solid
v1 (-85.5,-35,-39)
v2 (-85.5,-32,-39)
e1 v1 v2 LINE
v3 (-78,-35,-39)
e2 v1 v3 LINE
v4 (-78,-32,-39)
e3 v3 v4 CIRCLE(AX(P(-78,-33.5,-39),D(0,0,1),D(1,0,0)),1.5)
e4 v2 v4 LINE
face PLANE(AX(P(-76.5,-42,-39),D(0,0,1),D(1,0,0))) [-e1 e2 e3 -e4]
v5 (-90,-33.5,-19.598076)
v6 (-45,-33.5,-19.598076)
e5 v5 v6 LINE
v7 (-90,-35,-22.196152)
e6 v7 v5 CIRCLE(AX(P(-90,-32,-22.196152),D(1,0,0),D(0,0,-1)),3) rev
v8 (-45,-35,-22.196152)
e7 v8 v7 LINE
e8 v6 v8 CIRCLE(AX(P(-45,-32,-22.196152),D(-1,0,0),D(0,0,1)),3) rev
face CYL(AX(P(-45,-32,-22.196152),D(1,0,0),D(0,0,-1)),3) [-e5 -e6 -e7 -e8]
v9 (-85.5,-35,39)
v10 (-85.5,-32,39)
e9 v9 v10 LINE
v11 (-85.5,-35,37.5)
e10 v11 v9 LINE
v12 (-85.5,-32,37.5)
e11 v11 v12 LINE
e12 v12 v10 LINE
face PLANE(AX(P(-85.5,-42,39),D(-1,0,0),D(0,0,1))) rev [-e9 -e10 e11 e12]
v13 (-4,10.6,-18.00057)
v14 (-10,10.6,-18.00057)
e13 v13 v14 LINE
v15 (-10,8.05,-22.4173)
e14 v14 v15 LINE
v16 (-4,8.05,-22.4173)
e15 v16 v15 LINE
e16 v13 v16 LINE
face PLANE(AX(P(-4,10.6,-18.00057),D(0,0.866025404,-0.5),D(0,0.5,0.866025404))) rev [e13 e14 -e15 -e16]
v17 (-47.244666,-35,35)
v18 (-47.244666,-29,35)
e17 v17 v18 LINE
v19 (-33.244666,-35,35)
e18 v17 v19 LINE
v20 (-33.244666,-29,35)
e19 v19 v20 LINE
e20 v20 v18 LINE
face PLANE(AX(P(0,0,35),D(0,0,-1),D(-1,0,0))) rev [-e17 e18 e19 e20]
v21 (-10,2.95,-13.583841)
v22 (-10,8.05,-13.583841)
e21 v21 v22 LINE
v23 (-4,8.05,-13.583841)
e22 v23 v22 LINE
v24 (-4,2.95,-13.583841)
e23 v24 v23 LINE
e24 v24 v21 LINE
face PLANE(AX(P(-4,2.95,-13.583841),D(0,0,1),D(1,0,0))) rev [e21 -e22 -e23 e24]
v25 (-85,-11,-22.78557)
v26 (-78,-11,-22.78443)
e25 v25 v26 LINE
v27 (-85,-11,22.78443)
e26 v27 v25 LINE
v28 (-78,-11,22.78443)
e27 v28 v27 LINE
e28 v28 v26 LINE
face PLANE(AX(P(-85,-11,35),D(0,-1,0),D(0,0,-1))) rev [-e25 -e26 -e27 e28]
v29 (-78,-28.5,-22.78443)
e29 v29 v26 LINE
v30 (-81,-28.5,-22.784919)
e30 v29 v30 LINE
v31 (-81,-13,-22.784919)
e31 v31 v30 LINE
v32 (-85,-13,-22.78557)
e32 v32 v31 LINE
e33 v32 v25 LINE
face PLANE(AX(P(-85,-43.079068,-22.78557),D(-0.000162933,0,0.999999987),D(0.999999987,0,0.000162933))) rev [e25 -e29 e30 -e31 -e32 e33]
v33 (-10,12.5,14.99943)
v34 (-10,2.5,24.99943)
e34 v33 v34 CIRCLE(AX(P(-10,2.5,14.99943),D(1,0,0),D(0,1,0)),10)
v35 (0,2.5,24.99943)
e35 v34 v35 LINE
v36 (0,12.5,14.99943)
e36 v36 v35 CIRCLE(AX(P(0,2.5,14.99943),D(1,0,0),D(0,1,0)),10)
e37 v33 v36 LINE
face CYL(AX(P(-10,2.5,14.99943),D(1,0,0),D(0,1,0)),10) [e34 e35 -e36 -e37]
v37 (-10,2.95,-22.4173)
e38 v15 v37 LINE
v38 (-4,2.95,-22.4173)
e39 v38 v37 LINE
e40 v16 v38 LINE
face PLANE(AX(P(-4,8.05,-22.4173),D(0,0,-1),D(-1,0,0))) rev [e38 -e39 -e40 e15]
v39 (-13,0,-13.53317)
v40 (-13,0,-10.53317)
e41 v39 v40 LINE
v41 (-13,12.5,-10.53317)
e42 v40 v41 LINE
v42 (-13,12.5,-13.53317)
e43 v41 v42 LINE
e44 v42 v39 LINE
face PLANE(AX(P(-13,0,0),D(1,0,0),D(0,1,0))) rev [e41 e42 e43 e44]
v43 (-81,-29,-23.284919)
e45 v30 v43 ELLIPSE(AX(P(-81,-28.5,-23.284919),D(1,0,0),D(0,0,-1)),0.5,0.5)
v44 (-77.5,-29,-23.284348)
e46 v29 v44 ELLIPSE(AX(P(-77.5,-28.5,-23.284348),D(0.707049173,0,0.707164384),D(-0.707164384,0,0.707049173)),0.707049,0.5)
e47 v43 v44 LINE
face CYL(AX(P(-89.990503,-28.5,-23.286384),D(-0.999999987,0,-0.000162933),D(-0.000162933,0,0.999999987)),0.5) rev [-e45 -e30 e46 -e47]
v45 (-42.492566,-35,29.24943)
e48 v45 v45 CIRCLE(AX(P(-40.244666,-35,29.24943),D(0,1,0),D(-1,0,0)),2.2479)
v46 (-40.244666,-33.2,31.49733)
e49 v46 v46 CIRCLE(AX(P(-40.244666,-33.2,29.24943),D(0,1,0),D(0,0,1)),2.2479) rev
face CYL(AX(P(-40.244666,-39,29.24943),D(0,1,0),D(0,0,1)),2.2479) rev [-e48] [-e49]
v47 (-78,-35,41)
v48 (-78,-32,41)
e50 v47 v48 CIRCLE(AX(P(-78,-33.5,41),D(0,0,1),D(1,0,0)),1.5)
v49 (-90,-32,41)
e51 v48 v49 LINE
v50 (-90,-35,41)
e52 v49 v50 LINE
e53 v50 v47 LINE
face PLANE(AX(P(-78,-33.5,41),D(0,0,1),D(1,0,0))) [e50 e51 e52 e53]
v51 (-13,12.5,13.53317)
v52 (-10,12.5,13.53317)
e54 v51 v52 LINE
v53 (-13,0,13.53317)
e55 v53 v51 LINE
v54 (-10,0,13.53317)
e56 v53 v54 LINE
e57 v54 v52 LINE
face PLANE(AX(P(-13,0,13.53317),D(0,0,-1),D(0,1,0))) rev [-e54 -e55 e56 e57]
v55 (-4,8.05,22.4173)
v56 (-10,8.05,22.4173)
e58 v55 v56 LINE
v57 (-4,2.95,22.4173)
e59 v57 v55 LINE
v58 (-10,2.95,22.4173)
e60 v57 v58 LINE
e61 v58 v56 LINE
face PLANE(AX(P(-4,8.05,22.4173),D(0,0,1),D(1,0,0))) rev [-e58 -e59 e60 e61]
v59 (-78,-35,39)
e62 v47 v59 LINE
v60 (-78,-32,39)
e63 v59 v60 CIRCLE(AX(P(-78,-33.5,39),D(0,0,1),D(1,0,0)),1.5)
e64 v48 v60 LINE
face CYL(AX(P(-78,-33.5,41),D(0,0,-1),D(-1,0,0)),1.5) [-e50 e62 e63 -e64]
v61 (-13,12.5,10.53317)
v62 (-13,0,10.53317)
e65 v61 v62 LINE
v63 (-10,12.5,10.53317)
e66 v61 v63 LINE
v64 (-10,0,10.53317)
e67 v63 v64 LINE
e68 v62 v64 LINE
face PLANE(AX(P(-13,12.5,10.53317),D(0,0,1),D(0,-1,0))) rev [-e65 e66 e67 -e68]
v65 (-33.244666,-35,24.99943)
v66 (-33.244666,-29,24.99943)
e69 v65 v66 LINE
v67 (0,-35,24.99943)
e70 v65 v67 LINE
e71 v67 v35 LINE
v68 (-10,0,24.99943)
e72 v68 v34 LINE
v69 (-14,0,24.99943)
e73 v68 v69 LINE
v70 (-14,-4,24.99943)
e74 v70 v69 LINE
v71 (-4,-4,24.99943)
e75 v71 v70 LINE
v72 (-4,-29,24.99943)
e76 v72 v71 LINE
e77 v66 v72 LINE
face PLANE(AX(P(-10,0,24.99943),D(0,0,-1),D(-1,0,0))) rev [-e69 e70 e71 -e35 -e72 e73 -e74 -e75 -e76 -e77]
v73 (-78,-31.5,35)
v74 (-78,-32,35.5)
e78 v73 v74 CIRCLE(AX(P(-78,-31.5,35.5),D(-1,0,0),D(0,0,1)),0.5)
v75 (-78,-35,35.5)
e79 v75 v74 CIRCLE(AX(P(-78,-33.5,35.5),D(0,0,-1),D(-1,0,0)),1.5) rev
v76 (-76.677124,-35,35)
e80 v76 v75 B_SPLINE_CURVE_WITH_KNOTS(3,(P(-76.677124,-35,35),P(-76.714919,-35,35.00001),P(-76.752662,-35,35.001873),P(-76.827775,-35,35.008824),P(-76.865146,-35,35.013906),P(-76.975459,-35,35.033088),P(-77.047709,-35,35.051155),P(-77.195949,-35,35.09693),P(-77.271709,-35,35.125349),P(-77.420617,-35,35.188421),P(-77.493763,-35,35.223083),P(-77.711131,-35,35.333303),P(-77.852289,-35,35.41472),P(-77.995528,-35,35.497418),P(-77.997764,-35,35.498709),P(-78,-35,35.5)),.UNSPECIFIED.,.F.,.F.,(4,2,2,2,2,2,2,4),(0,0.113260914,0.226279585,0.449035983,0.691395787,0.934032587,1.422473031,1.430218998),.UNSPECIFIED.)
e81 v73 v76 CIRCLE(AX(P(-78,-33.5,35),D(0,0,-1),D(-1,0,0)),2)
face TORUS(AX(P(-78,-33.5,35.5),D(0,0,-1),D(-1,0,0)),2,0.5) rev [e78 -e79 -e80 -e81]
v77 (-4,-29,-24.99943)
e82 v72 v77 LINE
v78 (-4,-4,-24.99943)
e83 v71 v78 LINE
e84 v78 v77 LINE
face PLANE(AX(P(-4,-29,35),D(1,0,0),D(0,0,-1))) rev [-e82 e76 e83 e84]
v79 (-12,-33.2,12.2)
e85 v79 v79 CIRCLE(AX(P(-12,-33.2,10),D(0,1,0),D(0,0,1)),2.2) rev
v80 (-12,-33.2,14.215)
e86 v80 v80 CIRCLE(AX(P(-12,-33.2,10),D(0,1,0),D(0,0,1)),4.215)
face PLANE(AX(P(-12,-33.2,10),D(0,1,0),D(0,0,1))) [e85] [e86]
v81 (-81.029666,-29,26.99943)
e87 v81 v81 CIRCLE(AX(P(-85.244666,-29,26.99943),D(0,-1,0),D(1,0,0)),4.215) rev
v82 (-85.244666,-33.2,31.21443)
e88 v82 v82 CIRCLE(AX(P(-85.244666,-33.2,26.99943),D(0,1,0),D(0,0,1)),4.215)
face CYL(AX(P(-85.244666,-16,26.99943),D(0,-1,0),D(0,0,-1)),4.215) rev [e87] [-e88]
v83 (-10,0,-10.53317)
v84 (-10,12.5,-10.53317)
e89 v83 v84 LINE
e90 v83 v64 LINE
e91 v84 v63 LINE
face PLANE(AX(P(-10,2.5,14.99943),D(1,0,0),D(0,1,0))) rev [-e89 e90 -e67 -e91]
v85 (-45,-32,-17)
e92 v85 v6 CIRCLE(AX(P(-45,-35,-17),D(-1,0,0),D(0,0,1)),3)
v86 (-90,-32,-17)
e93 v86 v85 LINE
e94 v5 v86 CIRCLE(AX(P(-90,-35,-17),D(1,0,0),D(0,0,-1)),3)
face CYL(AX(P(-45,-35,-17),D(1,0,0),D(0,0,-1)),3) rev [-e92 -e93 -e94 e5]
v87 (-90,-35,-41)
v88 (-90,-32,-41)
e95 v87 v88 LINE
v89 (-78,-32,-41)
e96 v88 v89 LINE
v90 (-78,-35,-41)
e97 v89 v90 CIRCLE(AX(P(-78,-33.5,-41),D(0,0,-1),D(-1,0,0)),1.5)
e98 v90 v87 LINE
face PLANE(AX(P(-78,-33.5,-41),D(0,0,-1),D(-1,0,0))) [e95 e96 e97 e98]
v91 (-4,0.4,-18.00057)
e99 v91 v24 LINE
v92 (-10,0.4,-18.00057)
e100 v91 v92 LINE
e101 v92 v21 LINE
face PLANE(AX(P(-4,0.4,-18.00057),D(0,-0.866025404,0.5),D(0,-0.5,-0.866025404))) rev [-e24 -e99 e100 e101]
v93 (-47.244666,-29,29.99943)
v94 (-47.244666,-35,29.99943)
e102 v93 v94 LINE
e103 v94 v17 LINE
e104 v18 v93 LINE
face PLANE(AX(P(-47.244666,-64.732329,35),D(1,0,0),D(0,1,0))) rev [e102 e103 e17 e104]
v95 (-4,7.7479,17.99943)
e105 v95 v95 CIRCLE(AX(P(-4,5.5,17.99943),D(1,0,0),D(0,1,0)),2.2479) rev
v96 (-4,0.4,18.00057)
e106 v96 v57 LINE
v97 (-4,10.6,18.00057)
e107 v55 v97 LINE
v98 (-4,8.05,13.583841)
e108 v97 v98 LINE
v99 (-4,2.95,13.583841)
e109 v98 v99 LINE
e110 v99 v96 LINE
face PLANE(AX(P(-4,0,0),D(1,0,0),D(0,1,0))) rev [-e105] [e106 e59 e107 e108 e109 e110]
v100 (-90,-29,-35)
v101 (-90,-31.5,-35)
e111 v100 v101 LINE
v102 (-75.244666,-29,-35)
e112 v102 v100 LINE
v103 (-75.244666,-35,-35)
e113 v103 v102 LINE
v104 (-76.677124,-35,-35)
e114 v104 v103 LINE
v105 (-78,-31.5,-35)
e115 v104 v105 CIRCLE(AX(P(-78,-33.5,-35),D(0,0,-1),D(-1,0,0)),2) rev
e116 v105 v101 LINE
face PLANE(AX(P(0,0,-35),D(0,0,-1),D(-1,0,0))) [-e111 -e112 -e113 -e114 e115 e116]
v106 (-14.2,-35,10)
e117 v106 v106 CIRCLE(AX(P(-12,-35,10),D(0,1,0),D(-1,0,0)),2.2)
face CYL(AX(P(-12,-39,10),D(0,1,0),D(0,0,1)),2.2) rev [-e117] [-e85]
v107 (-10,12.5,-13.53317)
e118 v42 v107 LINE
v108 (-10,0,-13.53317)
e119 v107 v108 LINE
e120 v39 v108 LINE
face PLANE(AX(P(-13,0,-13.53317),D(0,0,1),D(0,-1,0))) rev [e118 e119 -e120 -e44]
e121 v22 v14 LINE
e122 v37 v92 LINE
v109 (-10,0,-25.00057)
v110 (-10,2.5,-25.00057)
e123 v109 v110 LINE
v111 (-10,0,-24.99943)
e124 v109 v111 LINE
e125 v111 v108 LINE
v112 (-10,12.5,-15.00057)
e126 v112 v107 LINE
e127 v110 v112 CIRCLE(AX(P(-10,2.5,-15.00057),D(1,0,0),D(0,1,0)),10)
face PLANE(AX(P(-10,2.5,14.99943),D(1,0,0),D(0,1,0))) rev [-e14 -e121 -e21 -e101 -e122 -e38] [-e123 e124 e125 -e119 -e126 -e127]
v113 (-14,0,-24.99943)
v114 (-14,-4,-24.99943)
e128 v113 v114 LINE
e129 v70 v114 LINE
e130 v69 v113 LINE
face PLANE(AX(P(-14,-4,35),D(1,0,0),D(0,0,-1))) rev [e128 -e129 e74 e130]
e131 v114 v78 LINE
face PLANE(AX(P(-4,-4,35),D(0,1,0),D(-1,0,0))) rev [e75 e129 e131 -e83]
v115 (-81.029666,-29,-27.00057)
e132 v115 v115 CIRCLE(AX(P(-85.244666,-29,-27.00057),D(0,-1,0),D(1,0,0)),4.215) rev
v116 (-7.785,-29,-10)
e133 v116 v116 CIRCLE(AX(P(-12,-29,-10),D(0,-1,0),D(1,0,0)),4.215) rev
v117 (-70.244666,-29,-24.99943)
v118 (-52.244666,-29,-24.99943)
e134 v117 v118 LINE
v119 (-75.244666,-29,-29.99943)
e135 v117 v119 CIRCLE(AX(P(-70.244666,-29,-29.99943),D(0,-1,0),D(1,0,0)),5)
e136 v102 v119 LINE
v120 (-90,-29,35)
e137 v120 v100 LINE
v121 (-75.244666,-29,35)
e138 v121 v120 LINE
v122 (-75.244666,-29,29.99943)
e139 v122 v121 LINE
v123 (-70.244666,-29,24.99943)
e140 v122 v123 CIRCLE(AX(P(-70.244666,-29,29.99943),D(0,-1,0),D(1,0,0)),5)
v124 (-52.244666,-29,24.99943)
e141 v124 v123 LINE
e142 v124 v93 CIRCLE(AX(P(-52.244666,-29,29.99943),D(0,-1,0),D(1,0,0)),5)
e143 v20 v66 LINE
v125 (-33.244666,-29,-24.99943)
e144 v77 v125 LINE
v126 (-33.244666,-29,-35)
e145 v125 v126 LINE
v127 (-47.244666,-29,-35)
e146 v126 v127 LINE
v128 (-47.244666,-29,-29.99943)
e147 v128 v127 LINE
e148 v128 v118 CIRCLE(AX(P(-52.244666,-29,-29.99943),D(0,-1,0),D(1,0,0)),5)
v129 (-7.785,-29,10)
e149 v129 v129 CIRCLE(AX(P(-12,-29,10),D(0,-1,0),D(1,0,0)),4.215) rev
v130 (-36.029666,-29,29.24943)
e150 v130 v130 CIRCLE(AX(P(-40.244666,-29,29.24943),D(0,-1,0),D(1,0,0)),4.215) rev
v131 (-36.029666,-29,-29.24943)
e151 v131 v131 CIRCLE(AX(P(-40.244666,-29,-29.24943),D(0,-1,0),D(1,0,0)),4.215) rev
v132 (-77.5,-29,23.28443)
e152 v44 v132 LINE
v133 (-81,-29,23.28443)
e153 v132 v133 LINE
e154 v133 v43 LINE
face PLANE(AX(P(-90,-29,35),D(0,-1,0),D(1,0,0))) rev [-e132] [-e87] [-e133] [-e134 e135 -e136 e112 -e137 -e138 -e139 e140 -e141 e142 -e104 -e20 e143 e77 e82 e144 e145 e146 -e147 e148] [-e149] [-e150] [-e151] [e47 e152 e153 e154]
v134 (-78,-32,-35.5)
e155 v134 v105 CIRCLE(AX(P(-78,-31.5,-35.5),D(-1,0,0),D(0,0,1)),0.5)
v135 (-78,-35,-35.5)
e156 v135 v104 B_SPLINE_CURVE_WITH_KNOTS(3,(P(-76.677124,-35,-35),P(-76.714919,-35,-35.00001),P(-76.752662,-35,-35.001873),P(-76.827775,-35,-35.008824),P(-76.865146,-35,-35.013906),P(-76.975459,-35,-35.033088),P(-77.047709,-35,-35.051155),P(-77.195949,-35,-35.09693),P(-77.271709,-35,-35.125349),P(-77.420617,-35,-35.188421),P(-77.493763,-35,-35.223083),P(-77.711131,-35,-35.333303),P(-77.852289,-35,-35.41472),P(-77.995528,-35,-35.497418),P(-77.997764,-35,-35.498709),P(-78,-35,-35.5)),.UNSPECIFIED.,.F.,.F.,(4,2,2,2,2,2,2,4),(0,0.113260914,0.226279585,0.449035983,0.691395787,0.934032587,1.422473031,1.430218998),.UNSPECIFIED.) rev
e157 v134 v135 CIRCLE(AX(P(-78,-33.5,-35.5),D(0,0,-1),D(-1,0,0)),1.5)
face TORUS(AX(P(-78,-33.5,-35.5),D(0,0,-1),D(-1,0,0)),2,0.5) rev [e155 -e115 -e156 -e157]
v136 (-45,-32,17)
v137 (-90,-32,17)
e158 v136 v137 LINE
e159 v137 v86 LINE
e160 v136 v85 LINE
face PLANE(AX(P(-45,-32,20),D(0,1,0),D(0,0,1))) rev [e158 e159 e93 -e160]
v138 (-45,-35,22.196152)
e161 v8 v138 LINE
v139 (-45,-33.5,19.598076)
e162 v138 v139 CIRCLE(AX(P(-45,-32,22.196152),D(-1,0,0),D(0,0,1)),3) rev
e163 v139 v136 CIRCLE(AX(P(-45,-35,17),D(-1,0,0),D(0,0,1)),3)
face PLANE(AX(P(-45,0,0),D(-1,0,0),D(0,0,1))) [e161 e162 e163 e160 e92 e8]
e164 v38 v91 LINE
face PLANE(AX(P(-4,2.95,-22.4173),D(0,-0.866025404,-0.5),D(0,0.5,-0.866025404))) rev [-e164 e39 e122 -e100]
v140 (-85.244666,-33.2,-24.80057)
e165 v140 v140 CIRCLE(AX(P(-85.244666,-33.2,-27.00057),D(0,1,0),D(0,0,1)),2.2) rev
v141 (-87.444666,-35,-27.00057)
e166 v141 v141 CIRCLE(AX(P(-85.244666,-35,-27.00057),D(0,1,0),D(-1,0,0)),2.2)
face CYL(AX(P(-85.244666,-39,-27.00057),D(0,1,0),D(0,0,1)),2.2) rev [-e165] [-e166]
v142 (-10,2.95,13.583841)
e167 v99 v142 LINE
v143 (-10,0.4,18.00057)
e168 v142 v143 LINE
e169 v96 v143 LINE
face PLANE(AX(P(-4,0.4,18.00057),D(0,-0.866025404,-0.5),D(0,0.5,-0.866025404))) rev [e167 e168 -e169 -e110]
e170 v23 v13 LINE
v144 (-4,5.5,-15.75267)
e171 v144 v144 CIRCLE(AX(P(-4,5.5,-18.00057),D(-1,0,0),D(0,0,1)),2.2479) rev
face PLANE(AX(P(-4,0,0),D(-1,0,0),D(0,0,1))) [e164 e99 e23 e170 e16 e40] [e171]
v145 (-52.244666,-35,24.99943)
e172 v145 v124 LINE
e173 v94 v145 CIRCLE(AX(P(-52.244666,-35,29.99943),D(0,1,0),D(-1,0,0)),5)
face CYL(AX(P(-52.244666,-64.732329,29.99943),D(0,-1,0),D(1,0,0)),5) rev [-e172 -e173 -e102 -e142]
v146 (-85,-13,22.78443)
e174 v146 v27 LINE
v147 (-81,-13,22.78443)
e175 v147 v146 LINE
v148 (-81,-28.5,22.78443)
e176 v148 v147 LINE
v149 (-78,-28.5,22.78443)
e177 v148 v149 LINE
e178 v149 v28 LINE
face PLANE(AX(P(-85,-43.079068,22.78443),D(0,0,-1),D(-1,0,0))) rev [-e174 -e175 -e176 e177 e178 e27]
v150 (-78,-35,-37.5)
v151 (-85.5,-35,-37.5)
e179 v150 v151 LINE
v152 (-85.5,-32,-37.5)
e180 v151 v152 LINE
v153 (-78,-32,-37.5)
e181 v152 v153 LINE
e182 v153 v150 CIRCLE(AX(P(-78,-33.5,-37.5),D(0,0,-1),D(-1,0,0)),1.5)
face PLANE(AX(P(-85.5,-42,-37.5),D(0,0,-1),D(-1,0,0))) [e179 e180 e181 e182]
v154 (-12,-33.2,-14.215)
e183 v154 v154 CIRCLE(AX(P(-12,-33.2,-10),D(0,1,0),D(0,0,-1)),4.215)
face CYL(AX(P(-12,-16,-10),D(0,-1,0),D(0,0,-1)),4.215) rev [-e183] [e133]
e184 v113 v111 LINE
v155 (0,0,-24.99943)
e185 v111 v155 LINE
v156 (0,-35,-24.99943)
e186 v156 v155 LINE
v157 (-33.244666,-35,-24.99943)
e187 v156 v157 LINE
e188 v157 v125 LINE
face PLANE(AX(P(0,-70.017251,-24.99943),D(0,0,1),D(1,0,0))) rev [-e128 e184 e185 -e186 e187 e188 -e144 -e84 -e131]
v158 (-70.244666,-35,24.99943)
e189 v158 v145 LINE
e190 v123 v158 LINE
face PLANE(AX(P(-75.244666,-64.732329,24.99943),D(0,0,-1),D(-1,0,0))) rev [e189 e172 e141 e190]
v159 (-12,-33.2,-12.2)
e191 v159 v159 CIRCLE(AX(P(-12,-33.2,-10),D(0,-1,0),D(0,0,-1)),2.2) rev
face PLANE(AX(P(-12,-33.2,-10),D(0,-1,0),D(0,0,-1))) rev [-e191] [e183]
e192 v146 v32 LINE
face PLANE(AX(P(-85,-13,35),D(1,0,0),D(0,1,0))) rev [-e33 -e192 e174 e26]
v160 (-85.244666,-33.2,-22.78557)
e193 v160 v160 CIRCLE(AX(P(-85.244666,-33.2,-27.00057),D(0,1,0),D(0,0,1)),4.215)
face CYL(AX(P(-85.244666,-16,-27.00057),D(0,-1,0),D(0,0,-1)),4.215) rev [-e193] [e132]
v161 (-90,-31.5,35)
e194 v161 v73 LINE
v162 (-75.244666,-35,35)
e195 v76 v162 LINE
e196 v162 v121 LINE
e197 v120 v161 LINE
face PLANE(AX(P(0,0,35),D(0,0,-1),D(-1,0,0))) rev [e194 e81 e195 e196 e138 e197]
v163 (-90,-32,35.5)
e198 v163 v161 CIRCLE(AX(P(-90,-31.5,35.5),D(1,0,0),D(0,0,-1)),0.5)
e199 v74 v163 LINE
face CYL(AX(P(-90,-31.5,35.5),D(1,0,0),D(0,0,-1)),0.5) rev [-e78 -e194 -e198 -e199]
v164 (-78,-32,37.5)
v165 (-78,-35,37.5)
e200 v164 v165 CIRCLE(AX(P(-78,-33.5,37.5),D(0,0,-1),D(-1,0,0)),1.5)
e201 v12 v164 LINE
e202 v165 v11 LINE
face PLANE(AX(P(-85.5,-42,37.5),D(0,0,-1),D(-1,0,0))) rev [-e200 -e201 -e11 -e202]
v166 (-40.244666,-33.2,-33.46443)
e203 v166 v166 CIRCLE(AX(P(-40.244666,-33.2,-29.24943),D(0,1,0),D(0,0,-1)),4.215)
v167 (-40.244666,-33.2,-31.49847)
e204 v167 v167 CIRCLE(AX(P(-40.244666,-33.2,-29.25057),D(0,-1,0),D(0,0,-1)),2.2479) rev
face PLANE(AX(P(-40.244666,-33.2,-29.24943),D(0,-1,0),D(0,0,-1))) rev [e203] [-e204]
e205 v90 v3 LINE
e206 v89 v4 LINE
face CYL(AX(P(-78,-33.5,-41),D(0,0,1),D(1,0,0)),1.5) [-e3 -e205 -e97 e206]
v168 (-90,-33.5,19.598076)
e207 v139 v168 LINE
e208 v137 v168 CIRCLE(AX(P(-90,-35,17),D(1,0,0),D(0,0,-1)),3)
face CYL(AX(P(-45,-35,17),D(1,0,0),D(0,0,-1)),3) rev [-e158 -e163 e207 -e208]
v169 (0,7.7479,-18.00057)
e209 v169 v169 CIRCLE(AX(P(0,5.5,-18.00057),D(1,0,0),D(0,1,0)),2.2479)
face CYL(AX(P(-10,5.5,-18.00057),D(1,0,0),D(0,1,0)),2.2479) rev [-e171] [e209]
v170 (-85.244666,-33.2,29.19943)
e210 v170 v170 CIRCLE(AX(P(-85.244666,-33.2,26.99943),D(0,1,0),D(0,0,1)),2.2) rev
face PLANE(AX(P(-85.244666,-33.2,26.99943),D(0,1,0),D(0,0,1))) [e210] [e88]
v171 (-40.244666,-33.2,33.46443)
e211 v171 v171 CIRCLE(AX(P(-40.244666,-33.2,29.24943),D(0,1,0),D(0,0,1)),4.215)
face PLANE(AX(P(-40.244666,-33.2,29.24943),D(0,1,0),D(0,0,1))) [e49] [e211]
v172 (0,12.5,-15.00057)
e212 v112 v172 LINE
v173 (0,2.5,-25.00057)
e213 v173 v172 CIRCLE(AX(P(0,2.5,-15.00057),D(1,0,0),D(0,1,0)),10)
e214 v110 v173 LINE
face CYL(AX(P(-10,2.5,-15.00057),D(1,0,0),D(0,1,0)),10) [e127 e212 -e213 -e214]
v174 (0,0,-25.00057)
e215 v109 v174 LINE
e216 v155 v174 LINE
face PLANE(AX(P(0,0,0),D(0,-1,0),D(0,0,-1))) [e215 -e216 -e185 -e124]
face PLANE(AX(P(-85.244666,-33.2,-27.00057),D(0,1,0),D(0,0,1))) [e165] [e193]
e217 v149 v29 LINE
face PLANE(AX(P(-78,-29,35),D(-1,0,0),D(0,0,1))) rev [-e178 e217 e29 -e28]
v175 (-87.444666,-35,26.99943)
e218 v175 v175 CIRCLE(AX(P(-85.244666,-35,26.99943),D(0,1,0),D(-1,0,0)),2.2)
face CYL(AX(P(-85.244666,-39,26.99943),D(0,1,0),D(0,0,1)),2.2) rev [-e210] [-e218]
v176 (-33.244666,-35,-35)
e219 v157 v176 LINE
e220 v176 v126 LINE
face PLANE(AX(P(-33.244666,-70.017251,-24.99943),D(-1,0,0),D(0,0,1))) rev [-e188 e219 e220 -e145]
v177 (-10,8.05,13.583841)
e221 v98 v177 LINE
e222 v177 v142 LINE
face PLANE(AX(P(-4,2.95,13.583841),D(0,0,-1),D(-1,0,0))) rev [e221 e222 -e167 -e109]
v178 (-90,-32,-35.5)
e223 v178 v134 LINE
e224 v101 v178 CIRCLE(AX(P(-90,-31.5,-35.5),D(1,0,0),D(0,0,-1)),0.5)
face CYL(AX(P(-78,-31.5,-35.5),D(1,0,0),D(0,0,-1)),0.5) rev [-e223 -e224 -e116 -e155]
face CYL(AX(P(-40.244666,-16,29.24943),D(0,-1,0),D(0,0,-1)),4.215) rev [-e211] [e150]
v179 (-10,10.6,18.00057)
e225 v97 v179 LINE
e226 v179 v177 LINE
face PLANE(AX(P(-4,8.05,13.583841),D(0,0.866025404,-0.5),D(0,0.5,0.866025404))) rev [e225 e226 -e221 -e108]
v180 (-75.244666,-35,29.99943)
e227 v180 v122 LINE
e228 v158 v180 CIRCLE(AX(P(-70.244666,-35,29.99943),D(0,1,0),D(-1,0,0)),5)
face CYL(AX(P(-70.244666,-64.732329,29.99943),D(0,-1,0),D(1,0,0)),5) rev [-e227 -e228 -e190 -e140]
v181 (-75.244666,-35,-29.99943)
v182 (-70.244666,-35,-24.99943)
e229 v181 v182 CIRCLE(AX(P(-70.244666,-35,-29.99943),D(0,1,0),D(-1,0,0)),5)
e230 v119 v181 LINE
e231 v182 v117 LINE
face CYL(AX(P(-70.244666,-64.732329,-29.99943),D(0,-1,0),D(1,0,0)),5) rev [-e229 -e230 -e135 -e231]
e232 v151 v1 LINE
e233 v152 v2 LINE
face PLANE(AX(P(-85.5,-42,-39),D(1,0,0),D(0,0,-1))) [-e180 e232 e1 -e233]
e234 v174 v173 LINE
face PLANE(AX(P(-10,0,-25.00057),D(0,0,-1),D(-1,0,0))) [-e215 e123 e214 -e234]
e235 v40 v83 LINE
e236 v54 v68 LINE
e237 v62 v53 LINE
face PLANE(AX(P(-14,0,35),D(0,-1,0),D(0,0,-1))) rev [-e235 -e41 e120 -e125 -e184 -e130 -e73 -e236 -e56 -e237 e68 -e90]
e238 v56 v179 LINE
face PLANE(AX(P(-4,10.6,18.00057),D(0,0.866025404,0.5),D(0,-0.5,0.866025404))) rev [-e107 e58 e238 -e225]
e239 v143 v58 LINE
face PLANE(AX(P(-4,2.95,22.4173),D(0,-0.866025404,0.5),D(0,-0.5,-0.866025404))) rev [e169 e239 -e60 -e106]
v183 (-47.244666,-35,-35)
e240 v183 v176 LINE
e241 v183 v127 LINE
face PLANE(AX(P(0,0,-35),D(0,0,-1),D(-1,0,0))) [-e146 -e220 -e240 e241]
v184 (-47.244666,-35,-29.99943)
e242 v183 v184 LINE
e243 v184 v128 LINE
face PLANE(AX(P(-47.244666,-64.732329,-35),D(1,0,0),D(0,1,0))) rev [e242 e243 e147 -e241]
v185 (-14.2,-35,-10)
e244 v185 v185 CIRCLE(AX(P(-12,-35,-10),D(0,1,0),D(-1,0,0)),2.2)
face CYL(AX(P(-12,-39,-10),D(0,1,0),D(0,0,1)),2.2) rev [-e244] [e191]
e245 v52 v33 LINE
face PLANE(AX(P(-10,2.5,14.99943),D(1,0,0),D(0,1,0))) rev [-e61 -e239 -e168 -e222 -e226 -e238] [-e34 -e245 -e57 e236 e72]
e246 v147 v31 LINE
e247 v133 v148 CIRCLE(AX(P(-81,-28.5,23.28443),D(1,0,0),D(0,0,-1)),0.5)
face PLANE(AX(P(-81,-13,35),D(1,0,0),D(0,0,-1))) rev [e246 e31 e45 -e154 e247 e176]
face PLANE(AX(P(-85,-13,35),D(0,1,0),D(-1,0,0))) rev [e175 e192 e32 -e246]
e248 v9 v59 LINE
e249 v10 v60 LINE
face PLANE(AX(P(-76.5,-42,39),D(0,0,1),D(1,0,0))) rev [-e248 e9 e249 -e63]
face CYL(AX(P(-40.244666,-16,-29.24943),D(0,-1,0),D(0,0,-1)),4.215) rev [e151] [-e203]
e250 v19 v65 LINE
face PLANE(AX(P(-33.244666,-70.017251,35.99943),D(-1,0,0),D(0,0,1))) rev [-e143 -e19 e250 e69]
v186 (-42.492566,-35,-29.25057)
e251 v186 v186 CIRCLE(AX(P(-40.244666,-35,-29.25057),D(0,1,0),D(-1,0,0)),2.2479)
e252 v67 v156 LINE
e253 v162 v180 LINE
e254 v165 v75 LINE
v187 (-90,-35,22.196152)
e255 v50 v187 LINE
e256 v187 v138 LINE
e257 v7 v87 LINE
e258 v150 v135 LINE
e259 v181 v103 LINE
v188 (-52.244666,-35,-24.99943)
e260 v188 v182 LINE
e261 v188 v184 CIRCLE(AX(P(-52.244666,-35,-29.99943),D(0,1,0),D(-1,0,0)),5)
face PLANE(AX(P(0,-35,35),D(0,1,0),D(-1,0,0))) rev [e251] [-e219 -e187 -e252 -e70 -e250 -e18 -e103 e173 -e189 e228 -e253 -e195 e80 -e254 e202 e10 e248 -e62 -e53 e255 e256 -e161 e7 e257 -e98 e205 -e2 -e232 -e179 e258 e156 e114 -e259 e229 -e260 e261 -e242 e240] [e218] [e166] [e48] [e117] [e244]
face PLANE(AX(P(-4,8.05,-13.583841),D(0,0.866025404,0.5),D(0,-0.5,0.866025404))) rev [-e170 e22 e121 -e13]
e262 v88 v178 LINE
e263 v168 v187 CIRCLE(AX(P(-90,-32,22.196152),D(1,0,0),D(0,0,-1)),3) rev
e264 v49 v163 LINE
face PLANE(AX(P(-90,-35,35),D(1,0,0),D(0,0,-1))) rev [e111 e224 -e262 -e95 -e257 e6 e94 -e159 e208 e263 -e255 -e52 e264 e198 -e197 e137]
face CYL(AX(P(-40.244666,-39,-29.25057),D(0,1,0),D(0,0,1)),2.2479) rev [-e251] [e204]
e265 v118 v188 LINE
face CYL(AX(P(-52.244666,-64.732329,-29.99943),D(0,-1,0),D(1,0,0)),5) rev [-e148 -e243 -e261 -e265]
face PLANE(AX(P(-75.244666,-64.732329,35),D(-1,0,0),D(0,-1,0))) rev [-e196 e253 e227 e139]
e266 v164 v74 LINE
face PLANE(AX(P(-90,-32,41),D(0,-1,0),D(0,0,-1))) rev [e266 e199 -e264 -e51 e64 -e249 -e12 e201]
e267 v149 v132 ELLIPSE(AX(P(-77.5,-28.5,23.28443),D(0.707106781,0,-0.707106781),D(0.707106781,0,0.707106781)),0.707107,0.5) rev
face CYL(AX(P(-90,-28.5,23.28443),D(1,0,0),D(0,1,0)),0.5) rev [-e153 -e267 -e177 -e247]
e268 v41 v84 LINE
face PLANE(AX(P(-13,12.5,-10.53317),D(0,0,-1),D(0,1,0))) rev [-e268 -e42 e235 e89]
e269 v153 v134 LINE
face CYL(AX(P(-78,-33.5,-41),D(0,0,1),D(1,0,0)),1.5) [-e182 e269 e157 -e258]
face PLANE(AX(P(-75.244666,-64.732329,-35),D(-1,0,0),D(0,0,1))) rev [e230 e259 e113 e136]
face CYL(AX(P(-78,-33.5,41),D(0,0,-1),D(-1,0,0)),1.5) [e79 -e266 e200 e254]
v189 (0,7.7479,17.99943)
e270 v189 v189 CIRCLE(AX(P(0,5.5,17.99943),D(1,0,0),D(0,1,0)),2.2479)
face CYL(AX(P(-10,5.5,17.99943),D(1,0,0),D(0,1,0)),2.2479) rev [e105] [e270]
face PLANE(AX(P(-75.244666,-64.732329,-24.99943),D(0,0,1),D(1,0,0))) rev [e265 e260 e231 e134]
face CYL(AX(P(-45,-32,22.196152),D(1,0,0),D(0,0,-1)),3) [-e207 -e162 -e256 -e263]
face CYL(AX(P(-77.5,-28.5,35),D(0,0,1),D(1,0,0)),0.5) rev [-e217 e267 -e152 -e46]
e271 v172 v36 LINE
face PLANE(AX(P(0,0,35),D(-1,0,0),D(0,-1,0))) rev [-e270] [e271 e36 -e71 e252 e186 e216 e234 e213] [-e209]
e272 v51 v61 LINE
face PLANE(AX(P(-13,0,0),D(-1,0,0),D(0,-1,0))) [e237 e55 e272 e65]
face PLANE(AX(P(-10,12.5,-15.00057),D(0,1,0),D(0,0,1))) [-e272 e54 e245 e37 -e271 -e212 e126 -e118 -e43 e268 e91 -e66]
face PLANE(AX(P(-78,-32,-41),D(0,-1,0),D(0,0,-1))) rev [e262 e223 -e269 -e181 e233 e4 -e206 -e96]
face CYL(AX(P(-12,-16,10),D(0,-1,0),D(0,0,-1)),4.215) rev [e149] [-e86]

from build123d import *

# Parameters (mm, degrees)
EXTRUDE_BASE_DEPTH              = 35
SKETCH2_R                       = 2.2
SKETCH2_R_2                     = 2.2479
CUT_BOLT_HOLES_DEPTH            = 10
CUT_BOLT_HEAD_INSETS_DEPTH      = 13
CUT_BOLT_HEAD_INSETS_DEPTH_BACK = 4.2
SKETCH3_R                       = 4.215
SKETCH4_W                       = 40
SKETCH4_H                       = 3
CUT_TOP_CLEARANCE_SLOT_DEPTH    = 45
FILLET_CLEARANCE_SLOT_PT_1_R    = 3
FILLET_CLEARANCE_SLOT_PT_2_R    = 3
BOSS_EXTRUDE1_DEPTH             = 6
BOSS_EXTRUDE2_START             = 6
BOSS_EXTRUDE2_DEPTH             = 6
SKETCH9_R                       = 2.2479
BOSS_EXTRUDE3_DEPTH             = 10
FILLET1_R                       = 0.5
CUT_EXTRUDE1_REACH              = 103.769
SKETCH10_W                      = 7
SKETCH10_H                      = 12.215570114
FILLET2_R                       = 0.5
CUT_EXTRUDE2_START              = -35
SKETCH11_W                      = 33.244666378
SKETCH11_H                      = 11
CUT_EXTRUDE2_DEPTH              = 35
SKETCH13_W                      = 28
SKETCH13_H                      = 10.000570114
CUT_EXTRUDE5_DEPTH              = 6
FILLET3_R                       = 5
SKETCH14_W                      = 3
SKETCH14_H                      = 12.5
BOSS_EXTRUDE4_DEPTH             = 3
SKETCH15_W                      = 9
SKETCH15_H                      = 1.5
CUT_EXTRUDE6_DEPTH              = 10
CUT_EXTRUDE7_DEPTH              = 6


# Some blends are built 0.0001 mm under size
with BuildPart() as part:
    # Sketch1 → Extrude-Base (new, symmetric)
    with BuildSketch(Plane.XY):
        Polygon((-14, 0), (0, 0), (0, -35), (-90, -35), (-90, -29), (-81, -29), (-81, -13), (-85, -13), (-85, -11), (-78, -11), (-78, -29), (-4, -29), (-4, -4), (-14, -4), align=None)
    extrude(amount=EXTRUDE_BASE_DEPTH, both=True)

    # Sketch2 → Cut-Bolt Holes (cut)
    with BuildSketch(Plane(origin=(0, -29, 0), x_dir=(1, 0, 0), z_dir=(0, 1, 0))):
        with Locations(Location((-12, -10, 0), (0, 0, 270))):
            Circle(SKETCH2_R)
        with Locations(Location((-12, 10, 0), (0, 0, 180))):
            Circle(SKETCH2_R)
        with Locations(Location((-40.244666378, 29.250570114, 0), (0, 0, 270))):
            Circle(SKETCH2_R_2)
        with Locations(Location((-40.244666378, -29.249429886, 0), (0, 0, 270))):
            Circle(SKETCH2_R_2)
        with Locations(Location((-85.244666378, 27.000570114, 0), (0, 0, 270))):
            Circle(SKETCH2_R)
        with Locations(Location((-85.244666378, -26.999429886, 0), (0, 0, 270))):
            Circle(SKETCH2_R)
    extrude(amount=-CUT_BOLT_HOLES_DEPTH, mode=Mode.SUBTRACT)

    # Sketch3 → Cut-Bolt Head Insets (cut, two sides: drawn at the far end of the back side and taken through both)
    with BuildSketch(Plane(origin=(0, -29, 0), x_dir=(1, 0, 0), z_dir=(0, 1, 0)).offset(-CUT_BOLT_HEAD_INSETS_DEPTH_BACK)):
        with Locations((-12, -10)):
            Circle(SKETCH3_R)
        with Locations((-40.244666378, -29.249429886)):
            Circle(SKETCH3_R)
        with Locations((-85.244666378, -26.999429886)):
            Circle(SKETCH3_R)
        with Locations((-85.244666378, 27.000570114)):
            Circle(SKETCH3_R)
        with Locations(Location((-12, 10, 0), (0, 0, 90))):
            Circle(SKETCH3_R)
        with Locations(Location((-40.244666378, 29.249429886, 0), (0, 0, 90))):
            Circle(SKETCH3_R)
    extrude(amount=CUT_BOLT_HEAD_INSETS_DEPTH + CUT_BOLT_HEAD_INSETS_DEPTH_BACK, mode=Mode.SUBTRACT)

    # Sketch4 → Cut-Top Clearance Slot (cut)
    with BuildSketch(Plane.ZY.offset(90)):
        with Locations((0, -33.5)):
            Rectangle(SKETCH4_W, SKETCH4_H)
    extrude(amount=-CUT_TOP_CLEARANCE_SLOT_DEPTH, mode=Mode.SUBTRACT)

    # Fillet-Clearance Slot Pt 1
    fillet_clearance_slot_pt_1_edges = [part.edges().sort_by_distance(p)[0] for p in [
        (-67.5, -32, 20),
        (-67.5, -32, -20),
    ]]
    fillet(fillet_clearance_slot_pt_1_edges, radius=FILLET_CLEARANCE_SLOT_PT_1_R - 0.0001)  # a hair under: the kernel refuses the full size

    # Fillet-Clearance Slot Pt 2
    # the kernel refuses this fillet: 3 mm, written as the material it takes off along each edge
    with BuildSketch(Plane(origin=(-95.490486718, -35, 20), x_dir=(0, 0, 1), z_dir=(1, 0, 0))) as fillet_clearance_slot_pt_2_piece_1:
        with BuildLine():
            CenterArc((2.196194687, -3), FILLET_CLEARANCE_SLOT_PT_2_R, 90, 60.000551337)
            Line((-0.401895958, -1.500025), (-0.661705022, -1.3500275))
            ThreePointArc((-0.661705022, -1.3500275), (-0.3, -0.0001), (-0.3, 0))
            Line((-0.3, 0), (0, 0.3))
            Line((0, 0.3), (2.196194687, 0.3))
            Line((2.196194687, 0.3), (2.196194687, 0))
        make_face()
    extrude(amount=50.490486718, mode=Mode.SUBTRACT)
    with BuildSketch(Plane(origin=(-95.490486718, -35, -20), x_dir=(0, 0.9659313848535164, 0.2587982993664522), z_dir=(1, 0, 0))) as fillet_clearance_slot_pt_2_piece_2:
        with BuildLine():
            CenterArc((2.329422704, -2.897768274), FILLET_CLEARANCE_SLOT_PT_2_R, 105.000679234, 60.000551337)
            Line((-0.56837145, -2.121373376), (-0.858150866, -2.043733886))
            Line((-0.858150866, -2.043733886), (-0.289779415, 0.07763949))
            Line((-0.289779415, 0.07763949), (0.07763949, 0.289779415))
            ThreePointArc((0.07763949, 0.289779415), (0.077736083, 0.289753536), (1.475282068, 0.289776827))
            Line((1.475282068, 0.289776827), (1.552931216, 0))
        make_face()
    extrude(amount=50.490486718, mode=Mode.SUBTRACT)

    # Sketch5 → Boss-Extrude1 (add)
    with BuildSketch(Plane.XY.offset(35)):
        with BuildLine():
            Line((-78, -35), (-90, -35))
            Line((-90, -35), (-90, -32))
            Line((-90, -32), (-78, -32))
            ThreePointArc((-78, -32), (-76.5, -33.5), (-78, -35))
        make_face()
    extrude(amount=BOSS_EXTRUDE1_DEPTH)

    # Sketch7 → Boss-Extrude2 (add)
    with BuildSketch(Plane(origin=(0, 0, -35), x_dir=(-1, 0, 0), z_dir=(0, 0, -1)).offset(BOSS_EXTRUDE2_START)):
        with BuildLine():
            Line((78, -32), (90, -32))
            Line((90, -32), (90, -35))
            Line((90, -35), (78, -35))
            ThreePointArc((78, -35), (76.5, -33.5), (78, -32))
        make_face()
    extrude(amount=-BOSS_EXTRUDE2_DEPTH)

    # Sketch9 → Boss-Extrude3 (add)
    with BuildSketch(Plane(origin=(0, 0, 0), x_dir=(0, 0, -1), z_dir=(1, 0, 0))):
        with BuildLine():
            Line((25.000570114, 0), (-24.999429886, 0))
            Line((-24.999429886, 0), (-24.999429886, 2.5))
            ThreePointArc((-24.999429886, 2.5), (-22.070497698, 9.571067812), (-14.999429886, 12.5))
            Line((-14.999429886, 12.5), (15.000570114, 12.5))
            ThreePointArc((15.000570114, 12.5), (22.071637926, 9.571067812), (25.000570114, 2.5))
            Line((25.000570114, 2.5), (25.000570114, 0))
        make_face()
        with Locations(Location((-17.999429886, 5.5, 0), (0, 0, 90))):
            Circle(SKETCH9_R, mode=Mode.SUBTRACT)
        with Locations(Location((18.000570114, 5.5, 0), (0, 0, 90))):
            Circle(SKETCH9_R, mode=Mode.SUBTRACT)
    extrude(amount=-BOSS_EXTRUDE3_DEPTH)

    # Fillet1
    # the kernel refuses this fillet: 0.5 mm, written as the material it adds along each edge
    with BuildSketch(Plane(origin=(-78, -33.5, 35), x_dir=(0, 1, 0), z_dir=(-1, 0, 0))) as fillet1_piece_1_section:
        with BuildLine():
            CenterArc((1.5 + FILLET1_R, -FILLET1_R), FILLET1_R, 90, 90)
            Line((1.5, -FILLET1_R), (1.5, 0))
            Line((1.5, 0), (1.5 + FILLET1_R, 0))
        make_face()
    fillet1_piece_1 = revolve(axis=Axis((-78, -33.5, 35), (0, 0, -1)), revolution_arc=227.8232683, mode=Mode.PRIVATE)
    fillet1_piece_1 = split(fillet1_piece_1, bisect_by=Plane(origin=(-77.658393022, -35, 35.082006822), z_dir=(0, 1, 0)), keep=Keep.TOP, mode=Mode.PRIVATE)
    add(fillet1_piece_1)
    with BuildSketch(Plane(origin=(-90, -32, 35), x_dir=(0, 1, 0), z_dir=(1, 0, 0))) as fillet1_piece_2:
        with BuildLine():
            CenterArc((FILLET1_R, FILLET1_R), FILLET1_R, 180, 90)
            Line((0, FILLET1_R), (0, 0))
            Line((0, 0), (FILLET1_R, 0))
        make_face()
    extrude(amount=12)
    with BuildSketch(Plane(origin=(-78, -33.5, -35), x_dir=(-0.741077326598375, -0.6714196869334451, 0), z_dir=(-0.6714196869334451, 0.741077326598375, 0))) as fillet1_piece_3_section:
        with BuildLine():
            CenterArc((1.5 + FILLET1_R, -FILLET1_R), FILLET1_R, 90, 90)
            Line((1.5, -FILLET1_R), (1.5, 0))
            Line((1.5, 0), (1.5 + FILLET1_R, 0))
        make_face()
    fillet1_piece_3 = revolve(axis=Axis((-78, -33.5, -35), (0, 0, 1)), revolution_arc=227.8232683, mode=Mode.PRIVATE)
    fillet1_piece_3 = split(fillet1_piece_3, bisect_by=Plane(origin=(-76.494034021, -35, -35.2500003), z_dir=(0, 1, 0)), keep=Keep.TOP, mode=Mode.PRIVATE)
    add(fillet1_piece_3)
    with BuildSketch(Plane(origin=(-78, -32, -35), x_dir=(0, 0, -1), z_dir=(-1, 0, 0))) as fillet1_piece_4:
        with BuildLine():
            CenterArc((FILLET1_R, -FILLET1_R), FILLET1_R, 90, 90)
            Line((0, -FILLET1_R), (0, 0))
            Line((0, 0), (FILLET1_R, 0))
        make_face()
    extrude(amount=12)

    # Cut-Extrude1: up to this face of the body (flat: up to its plane)
    cut_extrude1_end = Plane(part.part.faces().sort_by_distance((-85.554984705, -29, 0.000122771))[0])
    # Sketch10 → Cut-Extrude1 (cut, up to the picked face)
    with BuildSketch(Plane(origin=(0, -11, 0), x_dir=(1, 0, 0), z_dir=(0, 1, 0)), mode=Mode.PRIVATE) as cut_extrude1_sk1:
        with Locations((-81.5, -28.892214943)):
            Rectangle(SKETCH10_W, SKETCH10_H)
    cut_extrude1_tool1 = split(extrude(cut_extrude1_sk1.sketch, amount=-CUT_EXTRUDE1_REACH, mode=Mode.PRIVATE), bisect_by=cut_extrude1_end, keep=Keep.BOTH, mode=Mode.PRIVATE)
    # Sketch10 → Cut-Extrude1 (cut, up to the picked face)
    with BuildSketch(Plane(origin=(0, -11, 0), x_dir=(1, 0, 0), z_dir=(0, 1, 0)), mode=Mode.PRIVATE) as cut_extrude1_sk2:
        Polygon((-85, 22.785570416), (-78, 22.784429886), (-78, 35), (-85, 35), align=None)
    cut_extrude1_tool2 = split(extrude(cut_extrude1_sk2.sketch, amount=-CUT_EXTRUDE1_REACH, mode=Mode.PRIVATE), bisect_by=cut_extrude1_end, keep=Keep.BOTH, mode=Mode.PRIVATE)
    add(cut_extrude1_tool1.solids().sort_by(Axis((-81.5, -11, 28.892215), (0, -1, 0)))[0], mode=Mode.SUBTRACT)
    add(cut_extrude1_tool2.solids().sort_by(Axis((-81.499946, -11, -28.8925), (0, -1, 0)))[0], mode=Mode.SUBTRACT)

    # Fillet2
    fillet2_edges = [part.edges().sort_by_distance(p)[0] for p in [
        (-78, -29, 0),
        (-79.5, -29, 22.784429886),
        (-79.5, -29, -22.784674285),
    ]]
    fillet(fillet2_edges, radius=FILLET2_R)

    # Sketch11 → Cut-Extrude2 (cut)
    with BuildSketch(Plane(origin=(0, 0, 0), x_dir=(1, 0, 0), z_dir=(0, 1, 0)).offset(CUT_EXTRUDE2_START)):
        with Locations((-16.622333189, -30.499429886)):
            Rectangle(SKETCH11_W, SKETCH11_H)
        with Locations((-16.622333189, 30.499429886)):
            Rectangle(SKETCH11_W, SKETCH11_H)
    extrude(amount=CUT_EXTRUDE2_DEPTH, mode=Mode.SUBTRACT)

    # Sketch13 → Cut-Extrude5 (cut)
    with BuildSketch(Plane(origin=(0, -29, 0), x_dir=(1, 0, 0), z_dir=(0, 1, 0))):
        with Locations((-61.244666378, -29.999714943)):
            Rectangle(SKETCH13_W, SKETCH13_H)
        with Locations((-61.244666378, 29.999714943)):
            Rectangle(SKETCH13_W, SKETCH13_H)
    extrude(amount=-CUT_EXTRUDE5_DEPTH, mode=Mode.SUBTRACT)

    # Fillet3
    fillet3_edges = [part.edges().sort_by_distance(p)[0] for p in [
        (-75.244666378, -32, 24.999429886),
        (-47.244666378, -32, 24.999429886),
        (-75.244666378, -32, -24.999429886),
        (-47.244666378, -32, -24.999429886),
    ]]
    fillet(fillet3_edges, radius=FILLET3_R)

    # Sketch14 → Boss-Extrude4 (add)
    with BuildSketch(Plane.ZY.offset(10)):
        with Locations((12.033169886, 6.25)):
            Rectangle(SKETCH14_W, SKETCH14_H)
        with Locations((-12.033169886, 6.25)):
            Rectangle(SKETCH14_W, SKETCH14_H)
    extrude(amount=BOSS_EXTRUDE4_DEPTH)

    # Sketch15 → Cut-Extrude6 (cut)
    with BuildSketch(Plane(origin=(0, -32, 0), x_dir=(1, 0, 0), z_dir=(0, 1, 0))):
        with Locations((-81, -38.25)):
            Rectangle(SKETCH15_W, SKETCH15_H)
    cut_extrude6 = extrude(amount=-CUT_EXTRUDE6_DEPTH, mode=Mode.SUBTRACT)

    # Mirror1: Cut-Extrude6 across plane
    add(cut_extrude6.mirror(Plane.XY), mode=Mode.SUBTRACT)

    # Sketch16 → Cut-Extrude7 (cut)
    with BuildSketch(Plane.ZY.offset(10)):
        Polygon((-18.000570114, 0.4), (-13.583840555, 2.95), (-13.583840555, 8.05), (-18.000570114, 10.6), (-22.417299673, 8.05), (-22.417299673, 2.95), align=None)
        Polygon((22.417299673, 2.95), (18.000570114, 0.4), (13.583840555, 2.95), (13.583840555, 8.05), (18.000570114, 10.6), (22.417299673, 8.05), align=None)
    extrude(amount=-CUT_EXTRUDE7_DEPTH, mode=Mode.SUBTRACT)


solid = part.part
